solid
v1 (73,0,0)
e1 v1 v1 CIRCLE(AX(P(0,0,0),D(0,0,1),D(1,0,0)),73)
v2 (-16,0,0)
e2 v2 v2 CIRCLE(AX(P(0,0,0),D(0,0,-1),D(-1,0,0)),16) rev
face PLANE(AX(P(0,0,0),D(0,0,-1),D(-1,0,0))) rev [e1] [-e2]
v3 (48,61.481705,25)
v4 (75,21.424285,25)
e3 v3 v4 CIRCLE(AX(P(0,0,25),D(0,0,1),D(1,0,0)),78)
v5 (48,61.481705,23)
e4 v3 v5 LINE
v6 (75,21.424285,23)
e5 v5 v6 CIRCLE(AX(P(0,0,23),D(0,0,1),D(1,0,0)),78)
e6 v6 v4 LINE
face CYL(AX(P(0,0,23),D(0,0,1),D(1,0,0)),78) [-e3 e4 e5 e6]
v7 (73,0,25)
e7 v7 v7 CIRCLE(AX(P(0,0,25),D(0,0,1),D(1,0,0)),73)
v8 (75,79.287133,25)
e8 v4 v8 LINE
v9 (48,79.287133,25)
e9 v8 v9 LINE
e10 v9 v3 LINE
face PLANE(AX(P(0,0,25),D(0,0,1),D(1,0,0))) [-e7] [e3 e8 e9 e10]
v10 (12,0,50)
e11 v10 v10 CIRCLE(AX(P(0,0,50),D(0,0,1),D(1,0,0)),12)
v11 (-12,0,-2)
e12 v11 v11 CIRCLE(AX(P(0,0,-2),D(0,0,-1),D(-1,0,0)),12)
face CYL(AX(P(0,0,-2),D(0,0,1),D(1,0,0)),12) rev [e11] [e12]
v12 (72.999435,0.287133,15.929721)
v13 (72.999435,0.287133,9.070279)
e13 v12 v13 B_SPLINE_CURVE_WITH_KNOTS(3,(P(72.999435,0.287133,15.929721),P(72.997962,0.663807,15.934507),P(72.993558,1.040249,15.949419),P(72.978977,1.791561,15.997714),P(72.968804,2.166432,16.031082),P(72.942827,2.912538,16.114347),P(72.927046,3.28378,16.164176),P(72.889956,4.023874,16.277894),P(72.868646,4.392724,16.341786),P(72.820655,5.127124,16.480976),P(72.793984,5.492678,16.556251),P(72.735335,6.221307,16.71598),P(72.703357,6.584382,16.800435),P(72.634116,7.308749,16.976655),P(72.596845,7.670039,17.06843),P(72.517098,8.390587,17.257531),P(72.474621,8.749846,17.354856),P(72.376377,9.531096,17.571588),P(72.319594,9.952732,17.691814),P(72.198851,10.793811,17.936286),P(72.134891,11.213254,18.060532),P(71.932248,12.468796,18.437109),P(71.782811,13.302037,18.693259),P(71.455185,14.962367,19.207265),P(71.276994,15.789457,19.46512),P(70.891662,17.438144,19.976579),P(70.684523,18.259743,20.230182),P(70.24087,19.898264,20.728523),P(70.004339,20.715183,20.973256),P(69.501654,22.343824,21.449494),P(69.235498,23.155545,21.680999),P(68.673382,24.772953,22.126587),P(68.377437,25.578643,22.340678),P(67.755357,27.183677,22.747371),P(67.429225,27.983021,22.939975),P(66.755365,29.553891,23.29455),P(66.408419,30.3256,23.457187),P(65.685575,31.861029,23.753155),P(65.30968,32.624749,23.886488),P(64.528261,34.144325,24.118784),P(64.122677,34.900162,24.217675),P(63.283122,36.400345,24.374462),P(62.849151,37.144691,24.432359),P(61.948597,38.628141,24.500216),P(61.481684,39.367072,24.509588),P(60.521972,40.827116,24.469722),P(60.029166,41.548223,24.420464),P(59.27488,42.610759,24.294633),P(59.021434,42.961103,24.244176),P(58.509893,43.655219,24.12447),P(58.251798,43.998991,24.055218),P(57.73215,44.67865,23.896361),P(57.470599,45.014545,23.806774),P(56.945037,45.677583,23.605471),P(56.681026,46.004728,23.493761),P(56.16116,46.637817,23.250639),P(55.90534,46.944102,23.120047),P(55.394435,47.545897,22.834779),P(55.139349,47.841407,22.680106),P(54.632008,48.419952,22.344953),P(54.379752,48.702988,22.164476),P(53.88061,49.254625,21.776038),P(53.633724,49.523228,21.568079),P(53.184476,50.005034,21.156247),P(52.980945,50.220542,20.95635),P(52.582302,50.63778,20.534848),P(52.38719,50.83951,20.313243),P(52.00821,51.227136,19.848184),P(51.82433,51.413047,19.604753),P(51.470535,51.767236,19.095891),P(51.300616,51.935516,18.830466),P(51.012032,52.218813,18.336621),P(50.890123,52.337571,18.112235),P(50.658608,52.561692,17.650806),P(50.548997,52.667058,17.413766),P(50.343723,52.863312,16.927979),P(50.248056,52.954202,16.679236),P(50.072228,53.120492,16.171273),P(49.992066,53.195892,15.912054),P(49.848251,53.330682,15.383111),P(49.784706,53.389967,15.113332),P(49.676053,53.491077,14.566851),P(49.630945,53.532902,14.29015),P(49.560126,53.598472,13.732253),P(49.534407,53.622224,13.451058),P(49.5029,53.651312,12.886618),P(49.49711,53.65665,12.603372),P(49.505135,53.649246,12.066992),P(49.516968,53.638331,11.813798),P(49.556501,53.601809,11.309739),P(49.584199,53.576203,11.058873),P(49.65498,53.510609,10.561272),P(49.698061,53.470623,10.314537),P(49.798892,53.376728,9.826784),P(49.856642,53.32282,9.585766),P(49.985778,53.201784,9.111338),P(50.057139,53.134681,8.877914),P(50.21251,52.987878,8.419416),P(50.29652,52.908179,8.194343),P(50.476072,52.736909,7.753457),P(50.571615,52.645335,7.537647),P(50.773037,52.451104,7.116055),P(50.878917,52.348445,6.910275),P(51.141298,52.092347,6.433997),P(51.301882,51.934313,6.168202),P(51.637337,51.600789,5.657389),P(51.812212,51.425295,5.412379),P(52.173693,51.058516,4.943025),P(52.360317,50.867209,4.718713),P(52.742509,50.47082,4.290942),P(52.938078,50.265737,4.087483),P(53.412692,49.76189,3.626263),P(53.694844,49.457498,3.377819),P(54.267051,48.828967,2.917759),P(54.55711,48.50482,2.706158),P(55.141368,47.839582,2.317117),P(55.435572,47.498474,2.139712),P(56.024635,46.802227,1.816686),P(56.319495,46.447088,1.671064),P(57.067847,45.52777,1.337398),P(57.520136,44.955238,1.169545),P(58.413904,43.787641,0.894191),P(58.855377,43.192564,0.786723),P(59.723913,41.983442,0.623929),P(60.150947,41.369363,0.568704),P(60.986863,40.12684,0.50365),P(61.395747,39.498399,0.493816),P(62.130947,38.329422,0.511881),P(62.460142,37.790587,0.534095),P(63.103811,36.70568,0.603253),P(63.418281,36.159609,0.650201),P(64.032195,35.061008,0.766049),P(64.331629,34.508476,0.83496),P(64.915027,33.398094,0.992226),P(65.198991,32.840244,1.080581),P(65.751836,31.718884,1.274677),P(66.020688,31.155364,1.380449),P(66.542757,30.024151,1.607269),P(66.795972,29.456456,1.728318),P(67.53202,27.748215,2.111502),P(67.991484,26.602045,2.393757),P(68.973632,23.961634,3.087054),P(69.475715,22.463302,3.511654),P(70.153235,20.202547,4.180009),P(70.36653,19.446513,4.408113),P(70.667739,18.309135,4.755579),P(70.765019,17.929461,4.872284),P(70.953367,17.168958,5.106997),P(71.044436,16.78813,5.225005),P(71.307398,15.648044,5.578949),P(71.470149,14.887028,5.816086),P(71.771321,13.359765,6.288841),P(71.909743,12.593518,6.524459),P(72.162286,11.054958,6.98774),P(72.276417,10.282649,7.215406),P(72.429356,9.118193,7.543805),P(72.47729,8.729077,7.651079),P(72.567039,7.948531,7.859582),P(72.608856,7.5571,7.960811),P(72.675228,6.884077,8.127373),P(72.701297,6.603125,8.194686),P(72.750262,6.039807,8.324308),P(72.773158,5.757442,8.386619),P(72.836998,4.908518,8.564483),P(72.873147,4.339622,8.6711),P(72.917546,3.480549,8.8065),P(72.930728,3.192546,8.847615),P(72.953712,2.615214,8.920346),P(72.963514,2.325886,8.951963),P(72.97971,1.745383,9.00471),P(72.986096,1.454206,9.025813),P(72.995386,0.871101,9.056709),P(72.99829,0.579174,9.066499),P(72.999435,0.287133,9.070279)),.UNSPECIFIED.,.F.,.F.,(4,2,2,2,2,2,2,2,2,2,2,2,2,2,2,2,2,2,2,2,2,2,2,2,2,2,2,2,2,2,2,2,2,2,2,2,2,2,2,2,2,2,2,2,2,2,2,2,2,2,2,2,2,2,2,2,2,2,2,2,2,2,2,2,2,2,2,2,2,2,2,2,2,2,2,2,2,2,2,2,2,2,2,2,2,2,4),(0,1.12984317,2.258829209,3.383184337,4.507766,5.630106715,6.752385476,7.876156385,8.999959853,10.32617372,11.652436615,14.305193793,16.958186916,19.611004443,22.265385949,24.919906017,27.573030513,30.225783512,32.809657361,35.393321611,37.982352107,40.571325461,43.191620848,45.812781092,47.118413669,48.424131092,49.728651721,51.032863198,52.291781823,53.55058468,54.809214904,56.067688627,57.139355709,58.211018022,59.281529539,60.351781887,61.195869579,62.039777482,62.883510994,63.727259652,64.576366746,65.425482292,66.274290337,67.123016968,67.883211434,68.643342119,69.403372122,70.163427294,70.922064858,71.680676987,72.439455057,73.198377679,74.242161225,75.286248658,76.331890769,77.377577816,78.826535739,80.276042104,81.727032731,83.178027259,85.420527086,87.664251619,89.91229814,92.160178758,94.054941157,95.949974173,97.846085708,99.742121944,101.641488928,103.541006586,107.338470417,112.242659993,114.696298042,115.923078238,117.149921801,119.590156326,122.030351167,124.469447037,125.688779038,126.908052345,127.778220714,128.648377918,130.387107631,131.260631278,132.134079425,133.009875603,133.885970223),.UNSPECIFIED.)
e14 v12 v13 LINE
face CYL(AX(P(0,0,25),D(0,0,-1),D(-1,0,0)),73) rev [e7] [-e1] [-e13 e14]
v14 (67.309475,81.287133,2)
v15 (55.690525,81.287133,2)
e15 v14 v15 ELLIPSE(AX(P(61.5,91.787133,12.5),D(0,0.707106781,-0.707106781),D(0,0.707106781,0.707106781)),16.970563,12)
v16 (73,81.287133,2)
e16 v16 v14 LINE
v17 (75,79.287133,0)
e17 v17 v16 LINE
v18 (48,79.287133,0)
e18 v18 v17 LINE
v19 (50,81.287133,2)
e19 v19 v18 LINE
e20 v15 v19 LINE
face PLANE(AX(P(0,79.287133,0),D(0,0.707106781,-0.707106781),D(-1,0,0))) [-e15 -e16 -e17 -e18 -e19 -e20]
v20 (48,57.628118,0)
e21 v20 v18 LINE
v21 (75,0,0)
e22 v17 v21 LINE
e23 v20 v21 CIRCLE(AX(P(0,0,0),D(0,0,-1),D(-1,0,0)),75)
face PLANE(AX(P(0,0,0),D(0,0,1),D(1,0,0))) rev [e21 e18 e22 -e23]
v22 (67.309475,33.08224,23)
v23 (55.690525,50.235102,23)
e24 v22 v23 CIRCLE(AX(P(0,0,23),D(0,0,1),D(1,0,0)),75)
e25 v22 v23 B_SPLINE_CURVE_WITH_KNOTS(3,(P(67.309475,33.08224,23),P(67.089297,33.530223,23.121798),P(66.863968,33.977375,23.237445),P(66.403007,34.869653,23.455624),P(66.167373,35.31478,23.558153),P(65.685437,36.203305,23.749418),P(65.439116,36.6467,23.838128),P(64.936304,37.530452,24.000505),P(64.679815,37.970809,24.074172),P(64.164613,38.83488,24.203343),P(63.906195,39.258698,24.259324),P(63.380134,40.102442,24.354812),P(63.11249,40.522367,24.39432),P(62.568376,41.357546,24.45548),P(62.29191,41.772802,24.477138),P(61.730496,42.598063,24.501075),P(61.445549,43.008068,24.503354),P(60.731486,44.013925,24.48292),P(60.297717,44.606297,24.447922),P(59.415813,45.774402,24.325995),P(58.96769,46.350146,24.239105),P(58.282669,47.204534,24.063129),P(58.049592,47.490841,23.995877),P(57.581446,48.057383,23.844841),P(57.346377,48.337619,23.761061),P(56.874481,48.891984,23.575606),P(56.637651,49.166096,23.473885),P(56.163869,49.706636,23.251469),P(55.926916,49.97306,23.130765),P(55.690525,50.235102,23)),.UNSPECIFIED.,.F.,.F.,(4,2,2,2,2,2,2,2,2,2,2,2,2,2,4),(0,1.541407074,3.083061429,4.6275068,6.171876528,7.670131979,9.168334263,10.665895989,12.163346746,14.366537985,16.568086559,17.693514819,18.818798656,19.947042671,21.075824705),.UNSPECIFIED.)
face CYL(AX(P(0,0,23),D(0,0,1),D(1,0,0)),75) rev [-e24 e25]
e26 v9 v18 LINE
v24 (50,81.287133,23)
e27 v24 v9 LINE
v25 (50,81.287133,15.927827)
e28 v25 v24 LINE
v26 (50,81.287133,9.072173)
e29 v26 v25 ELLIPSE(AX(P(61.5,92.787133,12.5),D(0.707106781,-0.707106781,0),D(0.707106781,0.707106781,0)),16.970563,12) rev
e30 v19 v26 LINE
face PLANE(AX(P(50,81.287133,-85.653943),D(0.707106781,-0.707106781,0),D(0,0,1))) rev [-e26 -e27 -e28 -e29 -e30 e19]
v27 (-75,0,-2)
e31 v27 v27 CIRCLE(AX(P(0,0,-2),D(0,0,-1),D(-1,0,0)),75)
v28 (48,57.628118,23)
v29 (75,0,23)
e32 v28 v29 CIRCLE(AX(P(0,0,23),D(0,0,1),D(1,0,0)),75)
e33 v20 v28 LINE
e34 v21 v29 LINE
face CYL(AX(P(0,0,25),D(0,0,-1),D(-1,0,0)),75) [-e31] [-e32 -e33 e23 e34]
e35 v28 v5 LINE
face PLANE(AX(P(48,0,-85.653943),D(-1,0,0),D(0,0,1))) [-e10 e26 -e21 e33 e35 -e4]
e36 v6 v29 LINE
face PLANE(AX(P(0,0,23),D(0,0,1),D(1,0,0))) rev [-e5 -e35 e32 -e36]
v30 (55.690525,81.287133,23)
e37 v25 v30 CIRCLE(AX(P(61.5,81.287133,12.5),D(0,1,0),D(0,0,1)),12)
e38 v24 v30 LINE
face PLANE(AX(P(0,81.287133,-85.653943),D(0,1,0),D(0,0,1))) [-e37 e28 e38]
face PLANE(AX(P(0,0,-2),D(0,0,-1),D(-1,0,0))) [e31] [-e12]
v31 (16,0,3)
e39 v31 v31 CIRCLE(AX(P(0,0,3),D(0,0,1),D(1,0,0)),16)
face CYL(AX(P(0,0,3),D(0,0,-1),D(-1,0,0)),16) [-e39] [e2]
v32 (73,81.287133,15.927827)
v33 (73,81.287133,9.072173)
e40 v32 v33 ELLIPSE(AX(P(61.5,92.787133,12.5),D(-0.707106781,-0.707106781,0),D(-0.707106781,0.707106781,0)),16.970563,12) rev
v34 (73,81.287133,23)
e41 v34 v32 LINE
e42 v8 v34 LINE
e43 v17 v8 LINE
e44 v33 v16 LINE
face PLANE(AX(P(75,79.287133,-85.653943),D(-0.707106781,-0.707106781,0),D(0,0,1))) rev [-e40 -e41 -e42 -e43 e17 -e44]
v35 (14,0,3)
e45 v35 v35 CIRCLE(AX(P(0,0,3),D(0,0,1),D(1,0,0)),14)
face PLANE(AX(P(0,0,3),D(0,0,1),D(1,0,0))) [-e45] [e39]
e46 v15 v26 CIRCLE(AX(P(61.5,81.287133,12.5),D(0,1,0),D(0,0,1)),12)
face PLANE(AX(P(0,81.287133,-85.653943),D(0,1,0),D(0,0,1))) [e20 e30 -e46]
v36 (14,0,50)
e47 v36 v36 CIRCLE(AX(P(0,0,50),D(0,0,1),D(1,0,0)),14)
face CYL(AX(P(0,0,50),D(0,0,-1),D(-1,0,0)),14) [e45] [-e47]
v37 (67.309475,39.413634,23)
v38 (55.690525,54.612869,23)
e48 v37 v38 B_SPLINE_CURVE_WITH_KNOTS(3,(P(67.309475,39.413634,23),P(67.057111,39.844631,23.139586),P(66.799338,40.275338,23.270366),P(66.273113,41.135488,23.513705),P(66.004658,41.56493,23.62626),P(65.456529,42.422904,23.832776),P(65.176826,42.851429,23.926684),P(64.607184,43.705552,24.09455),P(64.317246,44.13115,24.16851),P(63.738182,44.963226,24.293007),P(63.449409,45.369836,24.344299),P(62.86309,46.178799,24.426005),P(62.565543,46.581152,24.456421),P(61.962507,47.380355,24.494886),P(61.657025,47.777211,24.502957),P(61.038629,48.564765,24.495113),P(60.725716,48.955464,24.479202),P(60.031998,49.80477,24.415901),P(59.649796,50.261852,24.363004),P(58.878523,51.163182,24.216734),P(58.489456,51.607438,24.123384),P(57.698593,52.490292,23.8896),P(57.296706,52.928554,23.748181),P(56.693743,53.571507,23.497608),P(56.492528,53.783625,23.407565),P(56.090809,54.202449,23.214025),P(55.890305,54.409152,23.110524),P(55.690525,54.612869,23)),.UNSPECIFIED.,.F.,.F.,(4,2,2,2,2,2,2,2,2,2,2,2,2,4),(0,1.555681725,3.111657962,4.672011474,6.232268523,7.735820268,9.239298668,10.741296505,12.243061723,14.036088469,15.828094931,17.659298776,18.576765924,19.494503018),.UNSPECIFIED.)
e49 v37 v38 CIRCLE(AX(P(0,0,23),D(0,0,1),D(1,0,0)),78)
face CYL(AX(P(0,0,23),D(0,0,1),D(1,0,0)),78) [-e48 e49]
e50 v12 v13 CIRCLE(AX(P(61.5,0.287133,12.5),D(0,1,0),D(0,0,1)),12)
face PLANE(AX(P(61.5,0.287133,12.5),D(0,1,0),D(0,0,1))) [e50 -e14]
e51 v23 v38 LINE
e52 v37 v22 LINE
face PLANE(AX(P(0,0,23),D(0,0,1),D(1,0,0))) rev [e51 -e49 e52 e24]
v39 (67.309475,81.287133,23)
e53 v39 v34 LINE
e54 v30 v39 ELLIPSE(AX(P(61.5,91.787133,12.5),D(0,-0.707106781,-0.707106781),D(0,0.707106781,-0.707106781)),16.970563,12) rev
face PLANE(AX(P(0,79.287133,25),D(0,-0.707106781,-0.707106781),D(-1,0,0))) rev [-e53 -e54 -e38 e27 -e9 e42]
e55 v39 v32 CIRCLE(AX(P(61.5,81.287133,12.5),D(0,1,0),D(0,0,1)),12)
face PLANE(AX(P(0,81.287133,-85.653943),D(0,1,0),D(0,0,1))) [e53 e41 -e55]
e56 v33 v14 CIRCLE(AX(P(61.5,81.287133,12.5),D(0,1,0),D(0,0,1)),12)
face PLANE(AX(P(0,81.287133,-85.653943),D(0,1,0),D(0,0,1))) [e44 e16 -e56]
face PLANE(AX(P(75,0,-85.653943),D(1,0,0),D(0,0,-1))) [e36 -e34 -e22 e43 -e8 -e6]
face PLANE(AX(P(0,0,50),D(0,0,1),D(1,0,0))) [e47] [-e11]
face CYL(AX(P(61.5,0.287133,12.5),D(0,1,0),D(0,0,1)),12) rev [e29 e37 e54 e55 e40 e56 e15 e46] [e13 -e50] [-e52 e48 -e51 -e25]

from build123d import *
from build123d.topology import SkipClean

# Parameters (mm, degrees)
SKETCH1_R           = 75
SKETCH1_R_2         = 73
BOSS_EXTRUDE1_DEPTH = 25
BOSS_EXTRUDE2_START = -25
BOSS_EXTRUDE2_DEPTH = 25
SKETCH4_R           = 12
CUT_EXTRUDE2_DEPTH  = 81
BOSS_EXTRUDE3_START = 2
SKETCH5_R           = 75
SKETCH5_R_2         = 12
BOSS_EXTRUDE3_DEPTH = 2
CHAMFER1_SIZE       = 2
SKETCH6_R           = 14
SKETCH6_R_2         = 12
BOSS_EXTRUDE4_DEPTH = 50
SKETCH7_R           = 16
SKETCH7_R_2         = 14
BOSS_EXTRUDE5_DEPTH = 3
BOSS_EXTRUDE6_START = -2
SKETCH8_R           = 78
SKETCH8_R_2         = 75
BOSS_EXTRUDE6_DEPTH = 2


with BuildPart() as part:
    # Sketch1 → Boss-Extrude1 (new body)
    with BuildSketch(Plane.XY):
        Circle(SKETCH1_R)
        Circle(SKETCH1_R_2, mode=Mode.SUBTRACT)
    extrude(amount=BOSS_EXTRUDE1_DEPTH)

    # Sketch2 → Boss-Extrude2 (add)
    with BuildSketch(Plane.XY.offset(25).offset(BOSS_EXTRUDE2_START)):
        with BuildLine():
            Line((75, 81.287132565), (48, 81.287132565))
            Line((48, 81.287132565), (48, 57.628118137))
            ThreePointArc((48, 57.628118137), (67.915388536, 31.819805153), (75, 0))
            Line((75, 0), (75, 81.287132565))
        make_face()
    extrude(amount=BOSS_EXTRUDE2_DEPTH)

    # Sketch4 → Cut-Extrude2 (cut)
    with BuildSketch(Plane(origin=(0, 81.287132565, 0), x_dir=(1, 0, 0), z_dir=(0, 1, 0))):
        with Locations(Location((61.5, -12.5, 0), (0, 0, 270))):
            Circle(SKETCH4_R)
    extrude(amount=-CUT_EXTRUDE2_DEPTH, mode=Mode.SUBTRACT)

    # Sketch5 → Boss-Extrude3 (add)
    with BuildSketch(Plane(origin=(0, 0, 0), x_dir=(-1, 0, 0), z_dir=(0, 0, -1)).offset(BOSS_EXTRUDE3_START)):
        Circle(SKETCH5_R)
        Circle(SKETCH5_R_2, mode=Mode.SUBTRACT)
    extrude(amount=-BOSS_EXTRUDE3_DEPTH)

    # Chamfer1
    # the kernel refuses this chamfer: 2 mm, written as the material it takes off along each edge
    with BuildSketch(Plane(origin=(75, 81.287132565, -5.143365976), x_dir=(0.027495876610589005, -0.9996219169112968, 0), z_dir=(0, 0, 1))) as chamfer1_piece_1:
        Polygon((CHAMFER1_SIZE * 0.999621916911, -CHAMFER1_SIZE * 0.0274958766106), (-CHAMFER1_SIZE * 0.0274958766106, -CHAMFER1_SIZE * 0.999621916911), (0, 0), align=None)
    extrude(amount=35.286731952, mode=Mode.SUBTRACT)
    with BuildSketch(Plane(origin=(48, 81.287132565, -5.143365976), x_dir=(-0.02749587661058555, -0.9996219169112968, 0), z_dir=(0, 0, 1))) as chamfer1_piece_2:
        Polygon((CHAMFER1_SIZE * 0.999621916911, CHAMFER1_SIZE * 0.0274958766106), (-CHAMFER1_SIZE * 0.0274958766106, CHAMFER1_SIZE * 0.999621916911), (0, 0), align=None)
    extrude(amount=35.286731952, mode=Mode.SUBTRACT)
    with BuildSketch(Plane(origin=(80.143365976, 81.287132565, 25), x_dir=(0, -0.9996219169112968, 0.02749587661058555), z_dir=(-1, 0, 0)), Plane(origin=(80.143365976, 81.287132565, 0), x_dir=(0, 0.02749587661058908, 0.9996219169112968), z_dir=(-1, 0, 0))) as chamfer1_piece_3:
        Polygon((CHAMFER1_SIZE * 0.999621916911, -CHAMFER1_SIZE * 0.0274958766106), (-CHAMFER1_SIZE * 0.0274958766106, -CHAMFER1_SIZE * 0.999621916911), (0, 0), align=None)
    extrude(amount=37.286731952, mode=Mode.SUBTRACT)

    # Sketch6 → Boss-Extrude4 (add)
    with SkipClean():  # the faces are left unmerged after this step: merging them gives an invalid solid
        with BuildSketch(Plane.XY):
            with Locations(Location((0, 0, 0), (0, 0, 180))):
                Circle(SKETCH6_R)
            Circle(SKETCH6_R_2, mode=Mode.SUBTRACT)
        extrude(amount=BOSS_EXTRUDE4_DEPTH)
    add(part.part.scale(1), mode=Mode.REPLACE)  # the faces are merged on a copy

    # Sketch7 → Boss-Extrude5 (add)
    with BuildSketch(Plane.XY):
        with Locations(Location((0, 0, 0), (0, 0, 180))):
            Circle(SKETCH7_R)
        Circle(SKETCH7_R_2, mode=Mode.SUBTRACT)
    extrude(amount=BOSS_EXTRUDE5_DEPTH)

    # Sketch8 → Boss-Extrude6 (add)
    with SkipClean():  # the faces are left unmerged after this step: merging them gives an invalid solid
        with BuildSketch(Plane.XY.offset(25).offset(BOSS_EXTRUDE6_START)):
            Circle(SKETCH8_R)
            with Locations(Location((0, 0, 0), (0, 0, 180))):
                Circle(SKETCH8_R_2, mode=Mode.SUBTRACT)
        extrude(amount=BOSS_EXTRUDE6_DEPTH)


solid = part.part
